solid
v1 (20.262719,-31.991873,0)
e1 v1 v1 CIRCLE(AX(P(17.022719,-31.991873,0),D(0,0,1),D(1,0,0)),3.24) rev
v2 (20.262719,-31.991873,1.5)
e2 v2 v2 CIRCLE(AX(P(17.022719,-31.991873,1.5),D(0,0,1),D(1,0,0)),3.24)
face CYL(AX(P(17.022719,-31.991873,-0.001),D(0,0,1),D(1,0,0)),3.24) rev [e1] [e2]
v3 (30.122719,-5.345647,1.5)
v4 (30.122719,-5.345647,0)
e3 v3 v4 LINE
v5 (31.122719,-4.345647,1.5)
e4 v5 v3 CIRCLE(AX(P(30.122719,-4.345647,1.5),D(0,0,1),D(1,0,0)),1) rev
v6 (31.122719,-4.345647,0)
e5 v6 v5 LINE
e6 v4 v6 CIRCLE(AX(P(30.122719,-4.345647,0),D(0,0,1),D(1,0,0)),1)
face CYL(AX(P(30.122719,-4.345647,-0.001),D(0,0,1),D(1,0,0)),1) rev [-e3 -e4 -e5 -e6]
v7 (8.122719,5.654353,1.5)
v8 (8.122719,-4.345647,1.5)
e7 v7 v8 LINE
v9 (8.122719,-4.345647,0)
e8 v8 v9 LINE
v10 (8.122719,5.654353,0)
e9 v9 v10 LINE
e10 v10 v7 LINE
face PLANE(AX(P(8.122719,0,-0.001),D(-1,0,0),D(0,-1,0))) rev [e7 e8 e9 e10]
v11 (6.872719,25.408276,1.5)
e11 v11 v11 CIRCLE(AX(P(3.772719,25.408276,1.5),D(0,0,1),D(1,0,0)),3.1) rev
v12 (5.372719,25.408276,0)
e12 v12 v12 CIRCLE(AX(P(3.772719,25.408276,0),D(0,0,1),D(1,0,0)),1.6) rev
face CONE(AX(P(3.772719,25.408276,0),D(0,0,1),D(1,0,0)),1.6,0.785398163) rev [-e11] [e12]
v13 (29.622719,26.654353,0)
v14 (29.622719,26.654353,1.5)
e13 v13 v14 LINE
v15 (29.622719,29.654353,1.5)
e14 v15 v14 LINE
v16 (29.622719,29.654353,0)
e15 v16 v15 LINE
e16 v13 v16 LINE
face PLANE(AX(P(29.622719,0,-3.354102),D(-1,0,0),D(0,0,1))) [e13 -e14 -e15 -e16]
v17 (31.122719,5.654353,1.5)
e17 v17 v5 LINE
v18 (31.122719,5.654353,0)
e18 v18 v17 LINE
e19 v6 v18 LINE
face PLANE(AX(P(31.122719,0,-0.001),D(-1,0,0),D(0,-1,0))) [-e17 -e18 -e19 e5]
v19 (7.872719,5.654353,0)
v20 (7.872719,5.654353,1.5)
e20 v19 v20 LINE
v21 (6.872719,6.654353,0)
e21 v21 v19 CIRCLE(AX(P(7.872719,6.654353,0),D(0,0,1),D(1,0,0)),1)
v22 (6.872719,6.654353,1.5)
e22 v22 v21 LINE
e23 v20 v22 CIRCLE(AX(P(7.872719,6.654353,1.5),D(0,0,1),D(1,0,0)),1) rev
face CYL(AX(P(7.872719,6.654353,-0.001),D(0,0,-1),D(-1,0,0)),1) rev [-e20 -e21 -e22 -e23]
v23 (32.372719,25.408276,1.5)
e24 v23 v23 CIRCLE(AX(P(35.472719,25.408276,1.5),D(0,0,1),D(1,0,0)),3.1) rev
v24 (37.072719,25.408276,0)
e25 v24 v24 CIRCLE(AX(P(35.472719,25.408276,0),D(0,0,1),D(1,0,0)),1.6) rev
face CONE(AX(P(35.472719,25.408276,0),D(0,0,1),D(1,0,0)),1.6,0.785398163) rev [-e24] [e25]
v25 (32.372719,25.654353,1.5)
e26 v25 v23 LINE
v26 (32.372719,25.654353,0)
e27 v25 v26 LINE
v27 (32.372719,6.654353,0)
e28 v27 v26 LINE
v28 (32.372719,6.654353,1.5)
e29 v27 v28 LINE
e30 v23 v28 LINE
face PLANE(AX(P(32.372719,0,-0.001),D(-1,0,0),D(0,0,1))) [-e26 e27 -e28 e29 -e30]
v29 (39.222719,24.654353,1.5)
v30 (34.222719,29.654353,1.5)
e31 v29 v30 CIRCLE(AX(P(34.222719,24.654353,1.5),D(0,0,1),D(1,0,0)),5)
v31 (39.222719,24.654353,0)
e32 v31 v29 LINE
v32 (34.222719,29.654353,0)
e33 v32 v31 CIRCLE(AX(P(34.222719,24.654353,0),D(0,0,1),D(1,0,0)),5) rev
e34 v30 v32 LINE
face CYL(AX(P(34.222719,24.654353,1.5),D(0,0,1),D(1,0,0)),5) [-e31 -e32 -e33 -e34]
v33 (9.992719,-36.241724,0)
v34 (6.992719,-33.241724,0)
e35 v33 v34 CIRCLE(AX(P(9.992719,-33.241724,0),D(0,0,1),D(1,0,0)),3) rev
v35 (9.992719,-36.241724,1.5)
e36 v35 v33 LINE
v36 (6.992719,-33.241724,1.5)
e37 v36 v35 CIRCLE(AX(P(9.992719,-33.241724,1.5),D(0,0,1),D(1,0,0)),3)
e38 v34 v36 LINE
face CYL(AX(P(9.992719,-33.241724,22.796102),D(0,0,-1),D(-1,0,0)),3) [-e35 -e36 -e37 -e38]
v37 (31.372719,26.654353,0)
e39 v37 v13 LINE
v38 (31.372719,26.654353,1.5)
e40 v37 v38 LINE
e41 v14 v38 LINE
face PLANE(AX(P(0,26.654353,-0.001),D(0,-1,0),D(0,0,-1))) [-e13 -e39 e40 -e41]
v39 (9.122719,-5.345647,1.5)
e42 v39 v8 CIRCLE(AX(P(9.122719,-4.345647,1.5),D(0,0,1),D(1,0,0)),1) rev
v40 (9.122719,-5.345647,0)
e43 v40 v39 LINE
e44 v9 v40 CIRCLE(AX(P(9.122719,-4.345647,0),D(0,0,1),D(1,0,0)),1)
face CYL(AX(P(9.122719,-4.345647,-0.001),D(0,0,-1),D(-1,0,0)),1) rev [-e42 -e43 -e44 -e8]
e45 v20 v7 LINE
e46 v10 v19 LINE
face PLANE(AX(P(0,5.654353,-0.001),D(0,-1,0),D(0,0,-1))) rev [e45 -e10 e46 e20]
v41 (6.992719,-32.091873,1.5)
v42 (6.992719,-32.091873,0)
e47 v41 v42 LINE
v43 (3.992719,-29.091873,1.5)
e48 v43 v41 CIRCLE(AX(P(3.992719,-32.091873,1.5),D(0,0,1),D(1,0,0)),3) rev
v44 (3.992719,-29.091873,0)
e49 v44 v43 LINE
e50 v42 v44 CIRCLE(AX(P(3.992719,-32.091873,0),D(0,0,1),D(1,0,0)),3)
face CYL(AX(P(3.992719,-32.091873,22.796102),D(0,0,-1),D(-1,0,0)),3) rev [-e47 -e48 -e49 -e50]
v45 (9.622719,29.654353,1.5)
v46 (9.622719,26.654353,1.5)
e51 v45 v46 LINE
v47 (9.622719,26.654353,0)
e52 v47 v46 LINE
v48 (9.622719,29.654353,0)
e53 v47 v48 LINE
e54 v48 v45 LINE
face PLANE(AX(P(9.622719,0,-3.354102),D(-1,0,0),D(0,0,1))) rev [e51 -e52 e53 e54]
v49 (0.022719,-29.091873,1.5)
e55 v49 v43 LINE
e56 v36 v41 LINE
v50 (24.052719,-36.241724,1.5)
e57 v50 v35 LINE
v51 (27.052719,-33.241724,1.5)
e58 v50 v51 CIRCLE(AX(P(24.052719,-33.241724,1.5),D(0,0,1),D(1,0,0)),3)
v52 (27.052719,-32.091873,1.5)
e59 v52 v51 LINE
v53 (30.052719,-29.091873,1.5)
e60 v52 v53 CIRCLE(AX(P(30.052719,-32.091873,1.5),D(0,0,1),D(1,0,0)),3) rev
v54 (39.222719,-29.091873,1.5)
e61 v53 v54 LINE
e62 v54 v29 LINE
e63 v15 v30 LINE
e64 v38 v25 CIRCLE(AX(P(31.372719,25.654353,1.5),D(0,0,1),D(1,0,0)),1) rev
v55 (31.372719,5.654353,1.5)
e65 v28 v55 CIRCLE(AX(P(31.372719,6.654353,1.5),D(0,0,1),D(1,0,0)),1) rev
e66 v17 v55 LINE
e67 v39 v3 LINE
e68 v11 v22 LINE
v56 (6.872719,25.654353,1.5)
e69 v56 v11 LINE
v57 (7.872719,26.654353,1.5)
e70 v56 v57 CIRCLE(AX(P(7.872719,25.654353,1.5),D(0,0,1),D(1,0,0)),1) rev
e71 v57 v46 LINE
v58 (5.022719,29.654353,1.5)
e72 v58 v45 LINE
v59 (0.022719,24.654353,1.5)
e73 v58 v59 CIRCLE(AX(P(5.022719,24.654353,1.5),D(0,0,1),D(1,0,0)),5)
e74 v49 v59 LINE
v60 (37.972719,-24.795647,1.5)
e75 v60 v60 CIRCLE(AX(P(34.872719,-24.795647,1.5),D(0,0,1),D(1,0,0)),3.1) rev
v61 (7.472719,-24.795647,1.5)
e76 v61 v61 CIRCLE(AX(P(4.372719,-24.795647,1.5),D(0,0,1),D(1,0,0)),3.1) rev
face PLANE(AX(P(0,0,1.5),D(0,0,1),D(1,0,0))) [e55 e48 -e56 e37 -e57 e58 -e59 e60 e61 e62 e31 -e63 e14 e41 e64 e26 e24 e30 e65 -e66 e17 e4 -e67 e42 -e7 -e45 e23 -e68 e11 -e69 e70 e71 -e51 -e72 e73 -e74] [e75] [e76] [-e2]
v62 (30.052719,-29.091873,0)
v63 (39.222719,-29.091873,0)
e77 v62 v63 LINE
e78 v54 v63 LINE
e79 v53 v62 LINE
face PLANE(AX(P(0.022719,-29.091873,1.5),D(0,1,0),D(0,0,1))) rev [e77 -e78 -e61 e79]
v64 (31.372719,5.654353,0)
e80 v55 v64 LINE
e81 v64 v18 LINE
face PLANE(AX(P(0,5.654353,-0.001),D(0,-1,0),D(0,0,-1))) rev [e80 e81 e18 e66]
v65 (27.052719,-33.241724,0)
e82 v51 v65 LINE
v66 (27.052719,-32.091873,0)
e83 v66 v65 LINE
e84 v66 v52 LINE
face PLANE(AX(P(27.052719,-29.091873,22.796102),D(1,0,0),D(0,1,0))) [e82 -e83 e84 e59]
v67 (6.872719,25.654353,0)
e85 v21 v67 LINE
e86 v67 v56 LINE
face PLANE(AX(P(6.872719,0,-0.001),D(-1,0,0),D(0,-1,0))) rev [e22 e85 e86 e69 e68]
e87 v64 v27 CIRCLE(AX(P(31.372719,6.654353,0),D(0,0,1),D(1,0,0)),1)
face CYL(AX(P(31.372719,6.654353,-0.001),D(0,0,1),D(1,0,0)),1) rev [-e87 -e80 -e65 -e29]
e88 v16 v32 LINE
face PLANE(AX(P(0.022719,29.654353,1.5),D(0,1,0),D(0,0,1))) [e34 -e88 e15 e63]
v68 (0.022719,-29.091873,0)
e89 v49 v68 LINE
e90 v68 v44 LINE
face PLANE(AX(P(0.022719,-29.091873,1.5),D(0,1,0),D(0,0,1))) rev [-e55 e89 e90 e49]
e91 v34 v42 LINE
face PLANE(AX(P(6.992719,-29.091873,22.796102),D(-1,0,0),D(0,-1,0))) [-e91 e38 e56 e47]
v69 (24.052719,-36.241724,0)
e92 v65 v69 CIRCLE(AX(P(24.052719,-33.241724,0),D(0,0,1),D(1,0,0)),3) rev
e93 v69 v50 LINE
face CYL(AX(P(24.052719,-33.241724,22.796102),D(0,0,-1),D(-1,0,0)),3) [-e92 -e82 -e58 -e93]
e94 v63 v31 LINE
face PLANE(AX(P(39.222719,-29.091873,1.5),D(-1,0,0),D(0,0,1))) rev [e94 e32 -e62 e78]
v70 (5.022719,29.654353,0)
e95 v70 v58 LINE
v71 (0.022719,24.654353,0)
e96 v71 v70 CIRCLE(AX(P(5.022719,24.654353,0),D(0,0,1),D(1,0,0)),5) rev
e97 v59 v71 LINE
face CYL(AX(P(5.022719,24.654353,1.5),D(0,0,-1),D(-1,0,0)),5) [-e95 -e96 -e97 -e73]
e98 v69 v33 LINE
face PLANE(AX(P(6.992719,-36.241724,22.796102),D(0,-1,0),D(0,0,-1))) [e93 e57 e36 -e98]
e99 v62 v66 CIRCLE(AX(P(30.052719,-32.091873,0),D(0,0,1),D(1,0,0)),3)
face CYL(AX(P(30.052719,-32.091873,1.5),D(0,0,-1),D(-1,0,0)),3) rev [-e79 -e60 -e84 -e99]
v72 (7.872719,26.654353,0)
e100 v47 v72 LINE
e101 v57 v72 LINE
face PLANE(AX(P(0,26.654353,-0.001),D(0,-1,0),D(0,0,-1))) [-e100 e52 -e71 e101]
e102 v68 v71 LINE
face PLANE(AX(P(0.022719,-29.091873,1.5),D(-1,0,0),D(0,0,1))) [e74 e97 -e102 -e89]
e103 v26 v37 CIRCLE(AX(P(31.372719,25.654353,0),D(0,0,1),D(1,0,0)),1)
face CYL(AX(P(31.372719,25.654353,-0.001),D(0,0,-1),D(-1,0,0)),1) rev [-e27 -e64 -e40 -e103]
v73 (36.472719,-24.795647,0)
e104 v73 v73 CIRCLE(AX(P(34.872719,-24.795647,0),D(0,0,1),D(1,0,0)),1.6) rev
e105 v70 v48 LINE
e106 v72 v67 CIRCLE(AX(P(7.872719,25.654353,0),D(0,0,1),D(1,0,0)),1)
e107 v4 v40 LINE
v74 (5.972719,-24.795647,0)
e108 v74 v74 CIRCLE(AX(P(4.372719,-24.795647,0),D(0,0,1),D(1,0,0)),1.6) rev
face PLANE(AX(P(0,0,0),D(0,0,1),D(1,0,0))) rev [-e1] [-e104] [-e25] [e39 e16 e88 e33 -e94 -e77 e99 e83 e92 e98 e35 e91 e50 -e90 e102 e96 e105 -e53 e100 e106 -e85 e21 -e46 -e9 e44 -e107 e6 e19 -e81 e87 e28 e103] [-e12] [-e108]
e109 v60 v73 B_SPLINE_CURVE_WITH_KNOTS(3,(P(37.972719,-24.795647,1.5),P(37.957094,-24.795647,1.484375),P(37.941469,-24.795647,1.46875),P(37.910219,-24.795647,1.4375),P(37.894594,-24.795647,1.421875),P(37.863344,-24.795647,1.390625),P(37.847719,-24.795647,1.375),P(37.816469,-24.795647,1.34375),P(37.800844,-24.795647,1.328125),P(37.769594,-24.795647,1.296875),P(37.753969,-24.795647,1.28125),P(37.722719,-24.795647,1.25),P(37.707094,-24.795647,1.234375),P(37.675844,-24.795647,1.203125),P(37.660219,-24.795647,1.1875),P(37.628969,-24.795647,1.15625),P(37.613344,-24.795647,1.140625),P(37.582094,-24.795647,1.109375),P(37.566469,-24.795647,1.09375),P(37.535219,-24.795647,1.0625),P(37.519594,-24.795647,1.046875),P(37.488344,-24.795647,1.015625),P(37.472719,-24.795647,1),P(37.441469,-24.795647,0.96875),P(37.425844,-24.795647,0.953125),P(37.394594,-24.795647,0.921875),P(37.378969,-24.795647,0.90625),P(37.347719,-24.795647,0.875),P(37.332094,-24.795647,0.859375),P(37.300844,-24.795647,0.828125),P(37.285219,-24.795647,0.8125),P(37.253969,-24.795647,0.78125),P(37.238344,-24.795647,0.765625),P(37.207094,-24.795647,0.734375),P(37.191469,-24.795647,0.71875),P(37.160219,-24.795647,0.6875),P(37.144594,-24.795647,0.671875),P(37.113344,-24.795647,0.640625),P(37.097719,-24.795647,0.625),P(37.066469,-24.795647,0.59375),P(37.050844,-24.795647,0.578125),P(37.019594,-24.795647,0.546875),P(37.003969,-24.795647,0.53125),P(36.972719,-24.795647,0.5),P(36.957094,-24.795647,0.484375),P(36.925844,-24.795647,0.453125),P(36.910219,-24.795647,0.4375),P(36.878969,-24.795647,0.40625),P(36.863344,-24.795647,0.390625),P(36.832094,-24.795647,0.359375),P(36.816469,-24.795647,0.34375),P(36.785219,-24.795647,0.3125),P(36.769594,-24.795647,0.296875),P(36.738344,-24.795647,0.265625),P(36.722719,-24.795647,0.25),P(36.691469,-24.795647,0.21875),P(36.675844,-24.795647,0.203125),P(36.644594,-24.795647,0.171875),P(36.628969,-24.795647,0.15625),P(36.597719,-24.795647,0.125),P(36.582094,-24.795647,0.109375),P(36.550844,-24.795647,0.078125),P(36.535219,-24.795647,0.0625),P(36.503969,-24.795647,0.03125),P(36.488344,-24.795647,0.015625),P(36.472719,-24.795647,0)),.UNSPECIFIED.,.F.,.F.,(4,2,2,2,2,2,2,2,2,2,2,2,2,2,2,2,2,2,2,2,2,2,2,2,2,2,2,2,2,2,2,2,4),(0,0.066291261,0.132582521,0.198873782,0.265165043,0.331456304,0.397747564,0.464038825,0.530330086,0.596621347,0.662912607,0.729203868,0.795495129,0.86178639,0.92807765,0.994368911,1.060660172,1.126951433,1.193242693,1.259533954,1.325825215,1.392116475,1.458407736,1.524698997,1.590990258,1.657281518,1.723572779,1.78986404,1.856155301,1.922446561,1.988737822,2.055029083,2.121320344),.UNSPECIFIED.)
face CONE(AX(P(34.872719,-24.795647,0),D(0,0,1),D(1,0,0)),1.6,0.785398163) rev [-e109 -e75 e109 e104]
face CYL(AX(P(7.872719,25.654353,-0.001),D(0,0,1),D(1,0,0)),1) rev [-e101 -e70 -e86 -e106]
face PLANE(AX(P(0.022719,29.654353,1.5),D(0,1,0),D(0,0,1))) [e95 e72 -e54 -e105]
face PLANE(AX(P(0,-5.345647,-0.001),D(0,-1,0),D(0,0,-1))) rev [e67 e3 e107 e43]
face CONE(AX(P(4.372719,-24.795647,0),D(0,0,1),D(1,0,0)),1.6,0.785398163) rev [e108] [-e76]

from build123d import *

# Parameters (mm, degrees)
SKETCH1_W                        = 39.2
SKETCH1_H                        = 58.746225757
BASE_DEPTH                       = 1.5
FRONT_FILLET_R                   = 5
BOLT_HOLE_CUT_REACH              = 51.194
SKETCH4_R                        = 1.6
BOLT_HEAD_CHAMBER_SIZE           = 1.5
CAMRA_HOLE_REACH                 = 51.194
SKETCH2_W                        = 23
SKETCH2_H                        = 21
SKETCH2_W_2                      = 1.25
SKETCH2_H_2                      = 3
SKETCH2_H_3                      = 8
SKETCH9_W                        = 1.5
SKETCH9_H                        = 3
CAMERA_SIDE_MOUNT_HOLDER_DEPTH   = 1.5
FILLET1_R                        = 1
SKETCH12_W                       = 20.06
SKETCH12_H                       = 7.149851194
ANTENNA_CONNECTOR_TOP_BASE_DEPTH = 1.5
ANTENNA_CONNECTOR_TOP_CUT_REACH  = 55.424
SKETCH13_R                       = 3.24
ANTENNA_TOP_CONNECTOR_FILLET_R   = 3
FILLET2_R                        = 1


with BuildPart() as part:
    # Sketch1 → Base (new body)
    with BuildSketch(Plane.XY):
        with Locations((19.622719192, 0.281239742)):
            Rectangle(SKETCH1_W, SKETCH1_H)
    extrude(amount=BASE_DEPTH)

    # Front fillet
    front_fillet_edges = [part.edges().sort_by_distance(p)[0] for p in [
        (0.022719192, 29.65435262, 0.75),
        (39.222719192, 29.65435262, 0.75),
    ]]
    fillet(front_fillet_edges, radius=FRONT_FILLET_R)

    # Sketch4 → Bolt hole cut (cut, up to next)
    with BuildSketch(Plane.XY.offset(1.5), mode=Mode.PRIVATE) as bolt_hole_cut_sk1:
        with Locations((34.872719192, -24.79564738)):
            Circle(SKETCH4_R)
    bolt_hole_cut_tool1 = extrude(bolt_hole_cut_sk1.sketch, amount=-BOLT_HOLE_CUT_REACH, mode=Mode.PRIVATE) & part.part
    # Sketch4 → Bolt hole cut (cut, up to next)
    with BuildSketch(Plane.XY.offset(1.5), mode=Mode.PRIVATE) as bolt_hole_cut_sk2:
        with Locations((4.372719192, -24.79564738)):
            Circle(SKETCH4_R)
    bolt_hole_cut_tool2 = extrude(bolt_hole_cut_sk2.sketch, amount=-BOLT_HOLE_CUT_REACH, mode=Mode.PRIVATE) & part.part
    # Sketch4 → Bolt hole cut (cut, up to next)
    with BuildSketch(Plane.XY.offset(1.5), mode=Mode.PRIVATE) as bolt_hole_cut_sk3:
        with Locations((3.772719192, 25.408275669)):
            Circle(SKETCH4_R)
    bolt_hole_cut_tool3 = extrude(bolt_hole_cut_sk3.sketch, amount=-BOLT_HOLE_CUT_REACH, mode=Mode.PRIVATE) & part.part
    # Sketch4 → Bolt hole cut (cut, up to next)
    with BuildSketch(Plane.XY.offset(1.5), mode=Mode.PRIVATE) as bolt_hole_cut_sk4:
        with Locations((35.472719192, 25.408275669)):
            Circle(SKETCH4_R)
    bolt_hole_cut_tool4 = extrude(bolt_hole_cut_sk4.sketch, amount=-BOLT_HOLE_CUT_REACH, mode=Mode.PRIVATE) & part.part
    add(bolt_hole_cut_tool1.solids().sort_by_distance((34.872719, -24.795647, 1.5))[0], mode=Mode.SUBTRACT)
    add(bolt_hole_cut_tool2.solids().sort_by_distance((4.372719, -24.795647, 1.5))[0], mode=Mode.SUBTRACT)
    add(bolt_hole_cut_tool3.solids().sort_by_distance((3.772719, 25.408276, 1.5))[0], mode=Mode.SUBTRACT)
    add(bolt_hole_cut_tool4.solids().sort_by_distance((35.472719, 25.408276, 1.5))[0], mode=Mode.SUBTRACT)

    # Bolt head chamber
    bolt_head_chamber_edges = [part.edges().sort_by_distance(p)[0] for p in [
        (33.272719192, -24.79564738, 1.5),
        (2.772719192, -24.79564738, 1.5),
        (2.172719192, 25.408275669, 1.5),
        (33.872719192, 25.408275669, 1.5),
    ]]
    chamfer(bolt_head_chamber_edges, length=BOLT_HEAD_CHAMBER_SIZE - 0.0001)  # a hair under: the kernel refuses the full size

    # Sketch2 → Camra hole (cut, up to next)
    with BuildSketch(Plane.XY.offset(1.5), mode=Mode.PRIVATE) as camra_hole_sk1:
        with Locations((19.622719192, 16.15435262)):
            Rectangle(SKETCH2_W, SKETCH2_H)
    camra_hole_tool1 = extrude(camra_hole_sk1.sketch, amount=-CAMRA_HOLE_REACH, mode=Mode.PRIVATE) & part.part
    # Sketch2 → Camra hole (cut, up to next)
    with BuildSketch(Plane.XY.offset(1.5), mode=Mode.PRIVATE) as camra_hole_sk2:
        with Locations((7.497719192, 16.15435262)):
            Rectangle(SKETCH2_W_2, SKETCH2_H)
    camra_hole_tool2 = extrude(camra_hole_sk2.sketch, amount=-CAMRA_HOLE_REACH, mode=Mode.PRIVATE) & part.part
    # Sketch2 → Camra hole (cut, up to next)
    with BuildSketch(Plane.XY.offset(1.5), mode=Mode.PRIVATE) as camra_hole_sk3:
        with Locations((31.747719192, 16.15435262)):
            Rectangle(SKETCH2_W_2, SKETCH2_H)
    camra_hole_tool3 = extrude(camra_hole_sk3.sketch, amount=-CAMRA_HOLE_REACH, mode=Mode.PRIVATE) & part.part
    # Sketch2 → Camra hole (cut, up to next)
    with BuildSketch(Plane.XY.offset(1.5), mode=Mode.PRIVATE) as camra_hole_sk4:
        with Locations((19.622719192, 4.15435262)):
            Rectangle(SKETCH2_W, SKETCH2_H_2)
    camra_hole_tool4 = extrude(camra_hole_sk4.sketch, amount=-CAMRA_HOLE_REACH, mode=Mode.PRIVATE) & part.part
    # Sketch2 → Camra hole (cut, up to next)
    with BuildSketch(Plane.XY.offset(1.5), mode=Mode.PRIVATE) as camra_hole_sk5:
        with Locations((19.622719192, -1.34564738)):
            Rectangle(SKETCH2_W, SKETCH2_H_3)
    camra_hole_tool5 = extrude(camra_hole_sk5.sketch, amount=-CAMRA_HOLE_REACH, mode=Mode.PRIVATE) & part.part
    # Sketch2 → Camra hole (cut, up to next)
    with BuildSketch(Plane.XY.offset(1.5), mode=Mode.PRIVATE) as camra_hole_sk6:
        with Locations((19.622719192, 28.15435262)):
            Rectangle(SKETCH2_W, SKETCH2_H_2)
    camra_hole_tool6 = extrude(camra_hole_sk6.sketch, amount=-CAMRA_HOLE_REACH, mode=Mode.PRIVATE) & part.part
    add(camra_hole_tool1.solids().sort_by_distance((19.622719, 16.154353, 1.5))[0], mode=Mode.SUBTRACT)
    add(camra_hole_tool2.solids().sort_by_distance((7.497719, 16.154353, 1.5))[0], mode=Mode.SUBTRACT)
    add(camra_hole_tool3.solids().sort_by_distance((31.747719, 16.154353, 1.5))[0], mode=Mode.SUBTRACT)
    add(camra_hole_tool4.solids().sort_by_distance((19.622719, 4.154353, 1.5))[0], mode=Mode.SUBTRACT)
    add(camra_hole_tool5.solids().sort_by_distance((19.622719, -1.345647, 1.5))[0], mode=Mode.SUBTRACT)
    add(camra_hole_tool6.solids().sort_by_distance((19.622719, 28.154353, 1.5))[0], mode=Mode.SUBTRACT)

    # Sketch9 → Camera side mount holder (add)
    with BuildSketch(Plane.XY.offset(1.5)):
        with Locations((8.872719192, 28.15435262)):
            Rectangle(SKETCH9_W, SKETCH9_H)
        with Locations((30.372719192, 28.15435262)):
            Rectangle(SKETCH9_W, SKETCH9_H)
    extrude(amount=-CAMERA_SIDE_MOUNT_HOLDER_DEPTH)

    # Fillet1
    fillet1_edges = [part.edges().sort_by_distance(p)[0] for p in [
        (32.372719192, 5.65435262, 0.75),
        (6.872719192, 5.65435262, 0.75),
    ]]
    fillet(fillet1_edges, radius=FILLET1_R)

    # Sketch12 → Antenna connector top base (add)
    with BuildSketch(Plane(origin=(0, 0, 0), x_dir=(-1, 0, 0), z_dir=(0, 0, -1))):
        with Locations((-17.022719192, -32.666798734)):
            Rectangle(SKETCH12_W, SKETCH12_H)
    extrude(amount=-ANTENNA_CONNECTOR_TOP_BASE_DEPTH)

    # Sketch13 → Antenna connector top cut (cut, up to next)
    with BuildSketch(Plane.XY.offset(1.5), mode=Mode.PRIVATE) as antenna_connector_top_cut_sk1:
        with Locations((17.022719192, -31.991873137)):
            Circle(SKETCH13_R)
    antenna_connector_top_cut_tool1 = extrude(antenna_connector_top_cut_sk1.sketch, amount=-ANTENNA_CONNECTOR_TOP_CUT_REACH, mode=Mode.PRIVATE) & part.part
    add(antenna_connector_top_cut_tool1.solids().sort_by_distance((17.022719, -31.991873, 1.5))[0], mode=Mode.SUBTRACT)

    # Antenna top connector fillet
    antenna_top_connector_fillet_edges = [part.edges().sort_by_distance(p)[0] for p in [
        (27.052719192, -29.091873137, 0.75),
        (27.052719192, -36.241724331, 0.75),
        (6.992719192, -36.241724331, 0.75),
        (6.992719192, -29.091873137, 0.75),
    ]]
    fillet(antenna_top_connector_fillet_edges, radius=ANTENNA_TOP_CONNECTOR_FILLET_R)

    # Fillet2
    fillet2_edges = [part.edges().sort_by_distance(p)[0] for p in [
        (32.372719192, 26.65435262, 0.75),
        (31.122719192, -5.34564738, 0.75),
        (8.122719192, -5.34564738, 0.75),
        (6.872719192, 26.65435262, 0.75),
    ]]
    fillet(fillet2_edges, radius=FILLET2_R)


solid = part.part
